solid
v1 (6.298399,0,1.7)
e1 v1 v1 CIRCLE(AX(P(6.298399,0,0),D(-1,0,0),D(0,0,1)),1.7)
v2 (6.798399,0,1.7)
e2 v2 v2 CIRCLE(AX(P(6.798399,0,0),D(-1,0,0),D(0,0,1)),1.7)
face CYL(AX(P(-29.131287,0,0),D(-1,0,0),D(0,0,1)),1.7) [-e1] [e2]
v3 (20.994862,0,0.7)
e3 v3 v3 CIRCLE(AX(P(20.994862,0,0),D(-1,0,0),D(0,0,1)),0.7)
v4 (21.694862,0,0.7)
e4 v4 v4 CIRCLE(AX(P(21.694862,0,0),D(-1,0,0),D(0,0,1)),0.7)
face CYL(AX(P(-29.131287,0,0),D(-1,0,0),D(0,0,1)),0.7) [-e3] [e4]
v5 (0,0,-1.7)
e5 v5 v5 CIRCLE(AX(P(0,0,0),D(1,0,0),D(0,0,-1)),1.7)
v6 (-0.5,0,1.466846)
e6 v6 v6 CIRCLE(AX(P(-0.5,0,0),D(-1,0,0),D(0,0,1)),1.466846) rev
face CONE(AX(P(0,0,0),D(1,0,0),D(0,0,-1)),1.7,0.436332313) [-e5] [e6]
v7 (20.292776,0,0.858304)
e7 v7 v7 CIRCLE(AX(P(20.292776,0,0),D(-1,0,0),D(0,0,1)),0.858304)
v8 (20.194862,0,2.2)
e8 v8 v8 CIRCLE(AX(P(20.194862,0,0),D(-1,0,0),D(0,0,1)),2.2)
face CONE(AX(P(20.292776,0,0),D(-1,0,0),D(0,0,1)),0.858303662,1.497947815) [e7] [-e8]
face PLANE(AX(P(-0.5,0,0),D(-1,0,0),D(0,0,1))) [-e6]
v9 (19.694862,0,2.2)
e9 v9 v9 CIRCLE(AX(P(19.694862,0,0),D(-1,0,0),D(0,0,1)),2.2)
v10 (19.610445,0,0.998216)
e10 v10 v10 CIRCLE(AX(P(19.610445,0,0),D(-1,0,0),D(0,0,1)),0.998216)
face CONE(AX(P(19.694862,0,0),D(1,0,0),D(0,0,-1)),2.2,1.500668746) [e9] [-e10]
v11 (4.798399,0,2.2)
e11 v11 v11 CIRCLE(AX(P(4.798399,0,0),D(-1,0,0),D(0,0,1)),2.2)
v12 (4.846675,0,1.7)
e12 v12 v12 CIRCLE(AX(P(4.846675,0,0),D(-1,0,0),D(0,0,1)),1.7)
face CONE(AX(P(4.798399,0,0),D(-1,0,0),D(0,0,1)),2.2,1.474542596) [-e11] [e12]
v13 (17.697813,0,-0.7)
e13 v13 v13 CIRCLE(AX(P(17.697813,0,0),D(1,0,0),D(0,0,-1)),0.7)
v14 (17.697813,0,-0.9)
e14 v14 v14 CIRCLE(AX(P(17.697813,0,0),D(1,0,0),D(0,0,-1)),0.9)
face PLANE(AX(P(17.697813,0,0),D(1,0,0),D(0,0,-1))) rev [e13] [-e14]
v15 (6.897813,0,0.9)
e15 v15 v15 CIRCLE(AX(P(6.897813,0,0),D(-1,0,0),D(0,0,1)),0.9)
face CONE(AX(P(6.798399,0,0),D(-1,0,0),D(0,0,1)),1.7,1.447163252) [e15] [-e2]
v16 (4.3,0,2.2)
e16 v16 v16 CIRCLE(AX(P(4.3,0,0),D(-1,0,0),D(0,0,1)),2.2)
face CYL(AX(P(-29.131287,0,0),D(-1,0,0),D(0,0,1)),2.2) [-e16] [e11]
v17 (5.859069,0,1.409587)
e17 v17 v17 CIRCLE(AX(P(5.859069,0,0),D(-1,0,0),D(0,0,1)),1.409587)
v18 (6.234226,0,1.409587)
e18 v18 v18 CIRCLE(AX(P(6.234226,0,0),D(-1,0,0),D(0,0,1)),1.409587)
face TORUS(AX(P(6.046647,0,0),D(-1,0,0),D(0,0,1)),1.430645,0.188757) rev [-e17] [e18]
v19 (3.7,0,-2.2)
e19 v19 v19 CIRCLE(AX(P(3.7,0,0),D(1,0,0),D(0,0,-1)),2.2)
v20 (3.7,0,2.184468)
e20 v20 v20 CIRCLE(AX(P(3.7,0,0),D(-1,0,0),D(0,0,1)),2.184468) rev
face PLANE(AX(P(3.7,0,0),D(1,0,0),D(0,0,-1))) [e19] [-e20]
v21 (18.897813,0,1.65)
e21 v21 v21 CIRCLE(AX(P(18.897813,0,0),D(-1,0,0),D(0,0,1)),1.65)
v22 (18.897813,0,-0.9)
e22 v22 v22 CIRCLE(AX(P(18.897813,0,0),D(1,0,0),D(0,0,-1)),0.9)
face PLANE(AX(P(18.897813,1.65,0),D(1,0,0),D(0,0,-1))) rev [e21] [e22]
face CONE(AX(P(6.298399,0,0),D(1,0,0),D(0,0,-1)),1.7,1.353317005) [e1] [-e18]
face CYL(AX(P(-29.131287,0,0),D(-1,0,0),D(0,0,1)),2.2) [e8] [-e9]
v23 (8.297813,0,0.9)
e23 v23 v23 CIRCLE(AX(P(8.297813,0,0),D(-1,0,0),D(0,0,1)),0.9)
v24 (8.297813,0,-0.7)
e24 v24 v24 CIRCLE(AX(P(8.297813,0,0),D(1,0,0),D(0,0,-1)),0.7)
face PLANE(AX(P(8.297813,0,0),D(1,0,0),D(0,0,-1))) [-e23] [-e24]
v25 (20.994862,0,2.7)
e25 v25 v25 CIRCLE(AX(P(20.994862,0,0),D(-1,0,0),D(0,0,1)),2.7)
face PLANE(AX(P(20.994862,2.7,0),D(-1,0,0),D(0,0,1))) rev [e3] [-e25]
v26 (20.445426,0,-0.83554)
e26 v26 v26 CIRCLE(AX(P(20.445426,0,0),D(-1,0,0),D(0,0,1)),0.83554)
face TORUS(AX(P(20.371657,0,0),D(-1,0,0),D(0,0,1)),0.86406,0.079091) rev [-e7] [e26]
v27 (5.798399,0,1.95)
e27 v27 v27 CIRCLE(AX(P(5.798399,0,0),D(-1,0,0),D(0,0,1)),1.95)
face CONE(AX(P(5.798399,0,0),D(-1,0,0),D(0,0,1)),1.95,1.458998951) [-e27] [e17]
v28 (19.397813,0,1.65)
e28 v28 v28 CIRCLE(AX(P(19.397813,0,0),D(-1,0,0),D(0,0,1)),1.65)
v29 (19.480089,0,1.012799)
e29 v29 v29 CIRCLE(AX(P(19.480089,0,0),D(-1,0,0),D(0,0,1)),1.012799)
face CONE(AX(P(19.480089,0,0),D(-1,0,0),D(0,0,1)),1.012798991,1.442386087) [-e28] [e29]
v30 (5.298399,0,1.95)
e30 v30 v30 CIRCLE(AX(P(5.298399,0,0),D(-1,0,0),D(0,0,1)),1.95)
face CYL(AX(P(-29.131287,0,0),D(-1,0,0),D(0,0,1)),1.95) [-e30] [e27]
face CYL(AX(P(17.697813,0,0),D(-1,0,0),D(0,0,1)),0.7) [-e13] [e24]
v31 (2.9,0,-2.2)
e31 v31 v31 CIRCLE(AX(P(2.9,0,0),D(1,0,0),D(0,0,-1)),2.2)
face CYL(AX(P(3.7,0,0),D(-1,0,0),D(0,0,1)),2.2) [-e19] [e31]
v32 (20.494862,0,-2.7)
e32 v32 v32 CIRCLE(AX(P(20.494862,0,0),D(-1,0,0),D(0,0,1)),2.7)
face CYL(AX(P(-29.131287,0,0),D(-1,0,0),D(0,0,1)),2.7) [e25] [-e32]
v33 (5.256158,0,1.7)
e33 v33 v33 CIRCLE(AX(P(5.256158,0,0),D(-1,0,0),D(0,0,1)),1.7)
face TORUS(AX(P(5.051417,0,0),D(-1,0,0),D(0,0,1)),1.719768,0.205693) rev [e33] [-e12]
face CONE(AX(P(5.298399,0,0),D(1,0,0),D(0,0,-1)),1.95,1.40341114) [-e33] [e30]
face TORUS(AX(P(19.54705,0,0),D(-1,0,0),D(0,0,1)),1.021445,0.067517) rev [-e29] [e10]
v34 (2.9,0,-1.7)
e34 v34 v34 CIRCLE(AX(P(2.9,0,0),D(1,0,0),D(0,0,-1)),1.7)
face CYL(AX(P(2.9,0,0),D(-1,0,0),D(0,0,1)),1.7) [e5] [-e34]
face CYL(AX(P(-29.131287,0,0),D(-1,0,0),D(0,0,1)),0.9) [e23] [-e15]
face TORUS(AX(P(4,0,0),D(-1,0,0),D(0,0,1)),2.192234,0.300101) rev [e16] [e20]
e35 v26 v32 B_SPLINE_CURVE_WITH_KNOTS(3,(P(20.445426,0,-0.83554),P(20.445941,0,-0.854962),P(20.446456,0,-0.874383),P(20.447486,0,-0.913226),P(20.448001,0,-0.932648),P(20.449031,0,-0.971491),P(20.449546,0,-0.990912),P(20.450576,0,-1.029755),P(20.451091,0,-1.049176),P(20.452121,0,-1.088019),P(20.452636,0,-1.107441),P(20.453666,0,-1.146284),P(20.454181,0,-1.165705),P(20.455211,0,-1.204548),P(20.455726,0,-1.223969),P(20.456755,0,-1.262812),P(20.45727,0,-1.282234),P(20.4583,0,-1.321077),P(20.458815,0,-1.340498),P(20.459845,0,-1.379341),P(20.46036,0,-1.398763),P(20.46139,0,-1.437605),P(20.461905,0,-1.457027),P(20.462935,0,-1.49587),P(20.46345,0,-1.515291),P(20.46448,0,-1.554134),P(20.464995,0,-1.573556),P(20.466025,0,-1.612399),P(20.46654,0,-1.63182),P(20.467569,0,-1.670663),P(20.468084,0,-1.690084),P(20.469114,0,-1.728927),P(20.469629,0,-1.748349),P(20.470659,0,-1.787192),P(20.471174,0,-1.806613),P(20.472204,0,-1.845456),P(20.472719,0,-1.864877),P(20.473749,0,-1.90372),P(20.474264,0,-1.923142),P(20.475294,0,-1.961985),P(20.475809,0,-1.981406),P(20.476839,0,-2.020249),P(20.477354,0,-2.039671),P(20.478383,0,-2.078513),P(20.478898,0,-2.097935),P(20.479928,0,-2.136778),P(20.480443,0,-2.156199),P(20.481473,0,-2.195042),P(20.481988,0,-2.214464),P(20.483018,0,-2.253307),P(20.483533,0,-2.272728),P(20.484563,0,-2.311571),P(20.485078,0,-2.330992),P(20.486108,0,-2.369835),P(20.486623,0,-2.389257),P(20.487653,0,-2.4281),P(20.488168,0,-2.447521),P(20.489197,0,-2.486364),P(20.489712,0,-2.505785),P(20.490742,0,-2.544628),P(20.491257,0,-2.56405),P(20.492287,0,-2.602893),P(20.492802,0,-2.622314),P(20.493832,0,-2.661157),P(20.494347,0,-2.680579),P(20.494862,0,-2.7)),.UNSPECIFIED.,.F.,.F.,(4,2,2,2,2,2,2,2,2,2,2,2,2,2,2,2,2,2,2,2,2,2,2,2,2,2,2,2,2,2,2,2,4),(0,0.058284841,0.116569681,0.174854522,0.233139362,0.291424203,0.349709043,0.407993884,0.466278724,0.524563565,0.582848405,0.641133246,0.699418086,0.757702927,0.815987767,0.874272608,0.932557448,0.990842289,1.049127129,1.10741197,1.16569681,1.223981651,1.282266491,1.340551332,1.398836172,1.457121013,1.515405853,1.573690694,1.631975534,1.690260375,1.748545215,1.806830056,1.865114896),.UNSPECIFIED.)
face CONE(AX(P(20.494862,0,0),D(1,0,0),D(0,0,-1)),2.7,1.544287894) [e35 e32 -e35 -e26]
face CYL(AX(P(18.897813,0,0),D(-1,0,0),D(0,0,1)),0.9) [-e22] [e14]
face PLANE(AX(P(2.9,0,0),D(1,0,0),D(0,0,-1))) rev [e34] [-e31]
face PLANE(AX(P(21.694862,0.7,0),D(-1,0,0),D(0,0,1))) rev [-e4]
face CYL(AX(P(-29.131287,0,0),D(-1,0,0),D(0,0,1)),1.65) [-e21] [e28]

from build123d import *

# Parameters (mm, degrees)
SKETCH1_R           = 1.7
BOSS_EXTRUDE1_DEPTH = 2.9
SKETCH2_R           = 2.2
BOSS_EXTRUDE2_DEPTH = 0.8
SKETCH4_R           = 0.7
BOSS_EXTRUDE3_DEPTH = 9.4
BOSS_EXTRUDE4_START = 1.2
SKETCH5_R           = 0.9
BOSS_EXTRUDE4_DEPTH = 1.2


# Read off the part's stored shape, not the designer's step: Revolve2, Boss-Extrude5
with BuildPart() as part:
    # Sketch1 → Boss-Extrude1 (new body)
    with BuildSketch(Plane(origin=(0, 0, 0), x_dir=(0, 0, -1), z_dir=(1, 0, 0))):
        Circle(SKETCH1_R)
    extrude(amount=BOSS_EXTRUDE1_DEPTH)

    # Sketch2 → Boss-Extrude2 (add)
    with BuildSketch(Plane(origin=(2.9, 0, 0), x_dir=(0, 0, -1), z_dir=(1, 0, 0))):
        Circle(SKETCH2_R)
    extrude(amount=BOSS_EXTRUDE2_DEPTH)

    # Revolve2 outline → Revolve2 (revolve)
    with BuildSketch(Plane.YX):
        with BuildLine():
            Line((1.7, 6.298399372), (1.7, 6.798399372))
            Line((1.7, 6.798399372), (0.9, 6.897812865))
            Line((0.9, 6.897812865), (0.9, 8.297812865))
            Line((0.9, 8.297812865), (0, 8.297812865))
            Line((0, 8.297812865), (0, 3.7))
            Line((0, 3.7), (2.184467787, 3.7))
            ThreePointArc((2.184467787, 3.7), (1.892233893, 4.007766107), (2.2, 4.3))
            Line((2.2, 4.3), (2.2, 4.798399372))
            Line((2.2, 4.798399372), (1.7, 4.846675418))
            ThreePointArc((1.7, 4.846675418), (1.514074869, 5.051416625), (1.7, 5.256157831))
            Line((1.7, 5.256157831), (1.95, 5.298399372))
            Line((1.95, 5.298399372), (1.95, 5.798399372))
            Line((1.95, 5.798399372), (1.409586795, 5.859069124))
            ThreePointArc((1.409586795, 5.859069124), (1.241888768, 6.046647338), (1.409586795, 6.234225552))
            Line((1.409586795, 6.234225552), (1.7, 6.298399372))
        make_face()
    revolve(axis=Axis((0, 0, 0), (1, 0, 0)))

    # Sketch4 → Boss-Extrude3 (add)
    with BuildSketch(Plane(origin=(8.297812865, 0, 0), x_dir=(0, 0, -1), z_dir=(1, 0, 0))):
        Circle(SKETCH4_R)
    extrude(amount=BOSS_EXTRUDE3_DEPTH)

    # Sketch5 → Boss-Extrude4 (add)
    with BuildSketch(Plane(origin=(17.697812865, 0, 0), x_dir=(0, 0, -1), z_dir=(1, 0, 0)).offset(BOSS_EXTRUDE4_START)):
        with Locations(Location((0, 0, 0), (0, 0, 180))):
            Circle(SKETCH5_R)
    extrude(amount=-BOSS_EXTRUDE4_DEPTH)

    # Sketch7 → Revolve3 (revolve)
    with BuildSketch(Plane.XY, mode=Mode.PRIVATE) as revolve3_sk:
        with BuildLine():
            Line((18.897812865, 1.65), (19.397812865, 1.65))
            Line((19.397812865, 1.65), (19.480088718, 1.012798991))
            ThreePointArc((19.480088718, 1.012798991), (19.539543647, 0.954346514), (19.610445316, 0.998216024))
            Line((19.610445316, 0.998216024), (19.694861948, 2.2))
            Line((19.694861948, 2.2), (20.194861948, 2.2))
            Line((20.194861948, 2.2), (20.292775797, 0.858303662))
            ThreePointArc((20.292775797, 0.858303662), (20.359991739, 0.78583442), (20.445426465, 0.83554037))
            Line((20.445426465, 0.83554037), (20.494861948, 2.7))
            Line((20.494861948, 2.7), (20.994861948, 2.7))
            Line((20.994861948, 2.7), (20.994861948, 0.7))
            Line((20.994861948, 0.7), (21.694861948, 0.7))
            Line((21.694861948, 0.7), (21.694861948, 0))
            Line((21.694861948, 0), (18.897812865, 0))
            Line((18.897812865, 0), (18.897812865, 1.65))
        make_face()
    revolve(revolve3_sk.sketch.rotate(Axis((-29.131286685, 0, 0), (1, 0, 0)), 90), axis=Axis((-29.131286685, 0, 0), (1, 0, 0)))

    # Boss-Extrude5 outline → Boss-Extrude5 (revolve)
    with BuildSketch(Plane.YX):
        Polygon((0, 0), (0, -0.5), (1.466846171, -0.5), (1.7, 0), align=None)
    revolve(axis=Axis((0, 0, 0), (1, 0, 0)))


solid = part.part
